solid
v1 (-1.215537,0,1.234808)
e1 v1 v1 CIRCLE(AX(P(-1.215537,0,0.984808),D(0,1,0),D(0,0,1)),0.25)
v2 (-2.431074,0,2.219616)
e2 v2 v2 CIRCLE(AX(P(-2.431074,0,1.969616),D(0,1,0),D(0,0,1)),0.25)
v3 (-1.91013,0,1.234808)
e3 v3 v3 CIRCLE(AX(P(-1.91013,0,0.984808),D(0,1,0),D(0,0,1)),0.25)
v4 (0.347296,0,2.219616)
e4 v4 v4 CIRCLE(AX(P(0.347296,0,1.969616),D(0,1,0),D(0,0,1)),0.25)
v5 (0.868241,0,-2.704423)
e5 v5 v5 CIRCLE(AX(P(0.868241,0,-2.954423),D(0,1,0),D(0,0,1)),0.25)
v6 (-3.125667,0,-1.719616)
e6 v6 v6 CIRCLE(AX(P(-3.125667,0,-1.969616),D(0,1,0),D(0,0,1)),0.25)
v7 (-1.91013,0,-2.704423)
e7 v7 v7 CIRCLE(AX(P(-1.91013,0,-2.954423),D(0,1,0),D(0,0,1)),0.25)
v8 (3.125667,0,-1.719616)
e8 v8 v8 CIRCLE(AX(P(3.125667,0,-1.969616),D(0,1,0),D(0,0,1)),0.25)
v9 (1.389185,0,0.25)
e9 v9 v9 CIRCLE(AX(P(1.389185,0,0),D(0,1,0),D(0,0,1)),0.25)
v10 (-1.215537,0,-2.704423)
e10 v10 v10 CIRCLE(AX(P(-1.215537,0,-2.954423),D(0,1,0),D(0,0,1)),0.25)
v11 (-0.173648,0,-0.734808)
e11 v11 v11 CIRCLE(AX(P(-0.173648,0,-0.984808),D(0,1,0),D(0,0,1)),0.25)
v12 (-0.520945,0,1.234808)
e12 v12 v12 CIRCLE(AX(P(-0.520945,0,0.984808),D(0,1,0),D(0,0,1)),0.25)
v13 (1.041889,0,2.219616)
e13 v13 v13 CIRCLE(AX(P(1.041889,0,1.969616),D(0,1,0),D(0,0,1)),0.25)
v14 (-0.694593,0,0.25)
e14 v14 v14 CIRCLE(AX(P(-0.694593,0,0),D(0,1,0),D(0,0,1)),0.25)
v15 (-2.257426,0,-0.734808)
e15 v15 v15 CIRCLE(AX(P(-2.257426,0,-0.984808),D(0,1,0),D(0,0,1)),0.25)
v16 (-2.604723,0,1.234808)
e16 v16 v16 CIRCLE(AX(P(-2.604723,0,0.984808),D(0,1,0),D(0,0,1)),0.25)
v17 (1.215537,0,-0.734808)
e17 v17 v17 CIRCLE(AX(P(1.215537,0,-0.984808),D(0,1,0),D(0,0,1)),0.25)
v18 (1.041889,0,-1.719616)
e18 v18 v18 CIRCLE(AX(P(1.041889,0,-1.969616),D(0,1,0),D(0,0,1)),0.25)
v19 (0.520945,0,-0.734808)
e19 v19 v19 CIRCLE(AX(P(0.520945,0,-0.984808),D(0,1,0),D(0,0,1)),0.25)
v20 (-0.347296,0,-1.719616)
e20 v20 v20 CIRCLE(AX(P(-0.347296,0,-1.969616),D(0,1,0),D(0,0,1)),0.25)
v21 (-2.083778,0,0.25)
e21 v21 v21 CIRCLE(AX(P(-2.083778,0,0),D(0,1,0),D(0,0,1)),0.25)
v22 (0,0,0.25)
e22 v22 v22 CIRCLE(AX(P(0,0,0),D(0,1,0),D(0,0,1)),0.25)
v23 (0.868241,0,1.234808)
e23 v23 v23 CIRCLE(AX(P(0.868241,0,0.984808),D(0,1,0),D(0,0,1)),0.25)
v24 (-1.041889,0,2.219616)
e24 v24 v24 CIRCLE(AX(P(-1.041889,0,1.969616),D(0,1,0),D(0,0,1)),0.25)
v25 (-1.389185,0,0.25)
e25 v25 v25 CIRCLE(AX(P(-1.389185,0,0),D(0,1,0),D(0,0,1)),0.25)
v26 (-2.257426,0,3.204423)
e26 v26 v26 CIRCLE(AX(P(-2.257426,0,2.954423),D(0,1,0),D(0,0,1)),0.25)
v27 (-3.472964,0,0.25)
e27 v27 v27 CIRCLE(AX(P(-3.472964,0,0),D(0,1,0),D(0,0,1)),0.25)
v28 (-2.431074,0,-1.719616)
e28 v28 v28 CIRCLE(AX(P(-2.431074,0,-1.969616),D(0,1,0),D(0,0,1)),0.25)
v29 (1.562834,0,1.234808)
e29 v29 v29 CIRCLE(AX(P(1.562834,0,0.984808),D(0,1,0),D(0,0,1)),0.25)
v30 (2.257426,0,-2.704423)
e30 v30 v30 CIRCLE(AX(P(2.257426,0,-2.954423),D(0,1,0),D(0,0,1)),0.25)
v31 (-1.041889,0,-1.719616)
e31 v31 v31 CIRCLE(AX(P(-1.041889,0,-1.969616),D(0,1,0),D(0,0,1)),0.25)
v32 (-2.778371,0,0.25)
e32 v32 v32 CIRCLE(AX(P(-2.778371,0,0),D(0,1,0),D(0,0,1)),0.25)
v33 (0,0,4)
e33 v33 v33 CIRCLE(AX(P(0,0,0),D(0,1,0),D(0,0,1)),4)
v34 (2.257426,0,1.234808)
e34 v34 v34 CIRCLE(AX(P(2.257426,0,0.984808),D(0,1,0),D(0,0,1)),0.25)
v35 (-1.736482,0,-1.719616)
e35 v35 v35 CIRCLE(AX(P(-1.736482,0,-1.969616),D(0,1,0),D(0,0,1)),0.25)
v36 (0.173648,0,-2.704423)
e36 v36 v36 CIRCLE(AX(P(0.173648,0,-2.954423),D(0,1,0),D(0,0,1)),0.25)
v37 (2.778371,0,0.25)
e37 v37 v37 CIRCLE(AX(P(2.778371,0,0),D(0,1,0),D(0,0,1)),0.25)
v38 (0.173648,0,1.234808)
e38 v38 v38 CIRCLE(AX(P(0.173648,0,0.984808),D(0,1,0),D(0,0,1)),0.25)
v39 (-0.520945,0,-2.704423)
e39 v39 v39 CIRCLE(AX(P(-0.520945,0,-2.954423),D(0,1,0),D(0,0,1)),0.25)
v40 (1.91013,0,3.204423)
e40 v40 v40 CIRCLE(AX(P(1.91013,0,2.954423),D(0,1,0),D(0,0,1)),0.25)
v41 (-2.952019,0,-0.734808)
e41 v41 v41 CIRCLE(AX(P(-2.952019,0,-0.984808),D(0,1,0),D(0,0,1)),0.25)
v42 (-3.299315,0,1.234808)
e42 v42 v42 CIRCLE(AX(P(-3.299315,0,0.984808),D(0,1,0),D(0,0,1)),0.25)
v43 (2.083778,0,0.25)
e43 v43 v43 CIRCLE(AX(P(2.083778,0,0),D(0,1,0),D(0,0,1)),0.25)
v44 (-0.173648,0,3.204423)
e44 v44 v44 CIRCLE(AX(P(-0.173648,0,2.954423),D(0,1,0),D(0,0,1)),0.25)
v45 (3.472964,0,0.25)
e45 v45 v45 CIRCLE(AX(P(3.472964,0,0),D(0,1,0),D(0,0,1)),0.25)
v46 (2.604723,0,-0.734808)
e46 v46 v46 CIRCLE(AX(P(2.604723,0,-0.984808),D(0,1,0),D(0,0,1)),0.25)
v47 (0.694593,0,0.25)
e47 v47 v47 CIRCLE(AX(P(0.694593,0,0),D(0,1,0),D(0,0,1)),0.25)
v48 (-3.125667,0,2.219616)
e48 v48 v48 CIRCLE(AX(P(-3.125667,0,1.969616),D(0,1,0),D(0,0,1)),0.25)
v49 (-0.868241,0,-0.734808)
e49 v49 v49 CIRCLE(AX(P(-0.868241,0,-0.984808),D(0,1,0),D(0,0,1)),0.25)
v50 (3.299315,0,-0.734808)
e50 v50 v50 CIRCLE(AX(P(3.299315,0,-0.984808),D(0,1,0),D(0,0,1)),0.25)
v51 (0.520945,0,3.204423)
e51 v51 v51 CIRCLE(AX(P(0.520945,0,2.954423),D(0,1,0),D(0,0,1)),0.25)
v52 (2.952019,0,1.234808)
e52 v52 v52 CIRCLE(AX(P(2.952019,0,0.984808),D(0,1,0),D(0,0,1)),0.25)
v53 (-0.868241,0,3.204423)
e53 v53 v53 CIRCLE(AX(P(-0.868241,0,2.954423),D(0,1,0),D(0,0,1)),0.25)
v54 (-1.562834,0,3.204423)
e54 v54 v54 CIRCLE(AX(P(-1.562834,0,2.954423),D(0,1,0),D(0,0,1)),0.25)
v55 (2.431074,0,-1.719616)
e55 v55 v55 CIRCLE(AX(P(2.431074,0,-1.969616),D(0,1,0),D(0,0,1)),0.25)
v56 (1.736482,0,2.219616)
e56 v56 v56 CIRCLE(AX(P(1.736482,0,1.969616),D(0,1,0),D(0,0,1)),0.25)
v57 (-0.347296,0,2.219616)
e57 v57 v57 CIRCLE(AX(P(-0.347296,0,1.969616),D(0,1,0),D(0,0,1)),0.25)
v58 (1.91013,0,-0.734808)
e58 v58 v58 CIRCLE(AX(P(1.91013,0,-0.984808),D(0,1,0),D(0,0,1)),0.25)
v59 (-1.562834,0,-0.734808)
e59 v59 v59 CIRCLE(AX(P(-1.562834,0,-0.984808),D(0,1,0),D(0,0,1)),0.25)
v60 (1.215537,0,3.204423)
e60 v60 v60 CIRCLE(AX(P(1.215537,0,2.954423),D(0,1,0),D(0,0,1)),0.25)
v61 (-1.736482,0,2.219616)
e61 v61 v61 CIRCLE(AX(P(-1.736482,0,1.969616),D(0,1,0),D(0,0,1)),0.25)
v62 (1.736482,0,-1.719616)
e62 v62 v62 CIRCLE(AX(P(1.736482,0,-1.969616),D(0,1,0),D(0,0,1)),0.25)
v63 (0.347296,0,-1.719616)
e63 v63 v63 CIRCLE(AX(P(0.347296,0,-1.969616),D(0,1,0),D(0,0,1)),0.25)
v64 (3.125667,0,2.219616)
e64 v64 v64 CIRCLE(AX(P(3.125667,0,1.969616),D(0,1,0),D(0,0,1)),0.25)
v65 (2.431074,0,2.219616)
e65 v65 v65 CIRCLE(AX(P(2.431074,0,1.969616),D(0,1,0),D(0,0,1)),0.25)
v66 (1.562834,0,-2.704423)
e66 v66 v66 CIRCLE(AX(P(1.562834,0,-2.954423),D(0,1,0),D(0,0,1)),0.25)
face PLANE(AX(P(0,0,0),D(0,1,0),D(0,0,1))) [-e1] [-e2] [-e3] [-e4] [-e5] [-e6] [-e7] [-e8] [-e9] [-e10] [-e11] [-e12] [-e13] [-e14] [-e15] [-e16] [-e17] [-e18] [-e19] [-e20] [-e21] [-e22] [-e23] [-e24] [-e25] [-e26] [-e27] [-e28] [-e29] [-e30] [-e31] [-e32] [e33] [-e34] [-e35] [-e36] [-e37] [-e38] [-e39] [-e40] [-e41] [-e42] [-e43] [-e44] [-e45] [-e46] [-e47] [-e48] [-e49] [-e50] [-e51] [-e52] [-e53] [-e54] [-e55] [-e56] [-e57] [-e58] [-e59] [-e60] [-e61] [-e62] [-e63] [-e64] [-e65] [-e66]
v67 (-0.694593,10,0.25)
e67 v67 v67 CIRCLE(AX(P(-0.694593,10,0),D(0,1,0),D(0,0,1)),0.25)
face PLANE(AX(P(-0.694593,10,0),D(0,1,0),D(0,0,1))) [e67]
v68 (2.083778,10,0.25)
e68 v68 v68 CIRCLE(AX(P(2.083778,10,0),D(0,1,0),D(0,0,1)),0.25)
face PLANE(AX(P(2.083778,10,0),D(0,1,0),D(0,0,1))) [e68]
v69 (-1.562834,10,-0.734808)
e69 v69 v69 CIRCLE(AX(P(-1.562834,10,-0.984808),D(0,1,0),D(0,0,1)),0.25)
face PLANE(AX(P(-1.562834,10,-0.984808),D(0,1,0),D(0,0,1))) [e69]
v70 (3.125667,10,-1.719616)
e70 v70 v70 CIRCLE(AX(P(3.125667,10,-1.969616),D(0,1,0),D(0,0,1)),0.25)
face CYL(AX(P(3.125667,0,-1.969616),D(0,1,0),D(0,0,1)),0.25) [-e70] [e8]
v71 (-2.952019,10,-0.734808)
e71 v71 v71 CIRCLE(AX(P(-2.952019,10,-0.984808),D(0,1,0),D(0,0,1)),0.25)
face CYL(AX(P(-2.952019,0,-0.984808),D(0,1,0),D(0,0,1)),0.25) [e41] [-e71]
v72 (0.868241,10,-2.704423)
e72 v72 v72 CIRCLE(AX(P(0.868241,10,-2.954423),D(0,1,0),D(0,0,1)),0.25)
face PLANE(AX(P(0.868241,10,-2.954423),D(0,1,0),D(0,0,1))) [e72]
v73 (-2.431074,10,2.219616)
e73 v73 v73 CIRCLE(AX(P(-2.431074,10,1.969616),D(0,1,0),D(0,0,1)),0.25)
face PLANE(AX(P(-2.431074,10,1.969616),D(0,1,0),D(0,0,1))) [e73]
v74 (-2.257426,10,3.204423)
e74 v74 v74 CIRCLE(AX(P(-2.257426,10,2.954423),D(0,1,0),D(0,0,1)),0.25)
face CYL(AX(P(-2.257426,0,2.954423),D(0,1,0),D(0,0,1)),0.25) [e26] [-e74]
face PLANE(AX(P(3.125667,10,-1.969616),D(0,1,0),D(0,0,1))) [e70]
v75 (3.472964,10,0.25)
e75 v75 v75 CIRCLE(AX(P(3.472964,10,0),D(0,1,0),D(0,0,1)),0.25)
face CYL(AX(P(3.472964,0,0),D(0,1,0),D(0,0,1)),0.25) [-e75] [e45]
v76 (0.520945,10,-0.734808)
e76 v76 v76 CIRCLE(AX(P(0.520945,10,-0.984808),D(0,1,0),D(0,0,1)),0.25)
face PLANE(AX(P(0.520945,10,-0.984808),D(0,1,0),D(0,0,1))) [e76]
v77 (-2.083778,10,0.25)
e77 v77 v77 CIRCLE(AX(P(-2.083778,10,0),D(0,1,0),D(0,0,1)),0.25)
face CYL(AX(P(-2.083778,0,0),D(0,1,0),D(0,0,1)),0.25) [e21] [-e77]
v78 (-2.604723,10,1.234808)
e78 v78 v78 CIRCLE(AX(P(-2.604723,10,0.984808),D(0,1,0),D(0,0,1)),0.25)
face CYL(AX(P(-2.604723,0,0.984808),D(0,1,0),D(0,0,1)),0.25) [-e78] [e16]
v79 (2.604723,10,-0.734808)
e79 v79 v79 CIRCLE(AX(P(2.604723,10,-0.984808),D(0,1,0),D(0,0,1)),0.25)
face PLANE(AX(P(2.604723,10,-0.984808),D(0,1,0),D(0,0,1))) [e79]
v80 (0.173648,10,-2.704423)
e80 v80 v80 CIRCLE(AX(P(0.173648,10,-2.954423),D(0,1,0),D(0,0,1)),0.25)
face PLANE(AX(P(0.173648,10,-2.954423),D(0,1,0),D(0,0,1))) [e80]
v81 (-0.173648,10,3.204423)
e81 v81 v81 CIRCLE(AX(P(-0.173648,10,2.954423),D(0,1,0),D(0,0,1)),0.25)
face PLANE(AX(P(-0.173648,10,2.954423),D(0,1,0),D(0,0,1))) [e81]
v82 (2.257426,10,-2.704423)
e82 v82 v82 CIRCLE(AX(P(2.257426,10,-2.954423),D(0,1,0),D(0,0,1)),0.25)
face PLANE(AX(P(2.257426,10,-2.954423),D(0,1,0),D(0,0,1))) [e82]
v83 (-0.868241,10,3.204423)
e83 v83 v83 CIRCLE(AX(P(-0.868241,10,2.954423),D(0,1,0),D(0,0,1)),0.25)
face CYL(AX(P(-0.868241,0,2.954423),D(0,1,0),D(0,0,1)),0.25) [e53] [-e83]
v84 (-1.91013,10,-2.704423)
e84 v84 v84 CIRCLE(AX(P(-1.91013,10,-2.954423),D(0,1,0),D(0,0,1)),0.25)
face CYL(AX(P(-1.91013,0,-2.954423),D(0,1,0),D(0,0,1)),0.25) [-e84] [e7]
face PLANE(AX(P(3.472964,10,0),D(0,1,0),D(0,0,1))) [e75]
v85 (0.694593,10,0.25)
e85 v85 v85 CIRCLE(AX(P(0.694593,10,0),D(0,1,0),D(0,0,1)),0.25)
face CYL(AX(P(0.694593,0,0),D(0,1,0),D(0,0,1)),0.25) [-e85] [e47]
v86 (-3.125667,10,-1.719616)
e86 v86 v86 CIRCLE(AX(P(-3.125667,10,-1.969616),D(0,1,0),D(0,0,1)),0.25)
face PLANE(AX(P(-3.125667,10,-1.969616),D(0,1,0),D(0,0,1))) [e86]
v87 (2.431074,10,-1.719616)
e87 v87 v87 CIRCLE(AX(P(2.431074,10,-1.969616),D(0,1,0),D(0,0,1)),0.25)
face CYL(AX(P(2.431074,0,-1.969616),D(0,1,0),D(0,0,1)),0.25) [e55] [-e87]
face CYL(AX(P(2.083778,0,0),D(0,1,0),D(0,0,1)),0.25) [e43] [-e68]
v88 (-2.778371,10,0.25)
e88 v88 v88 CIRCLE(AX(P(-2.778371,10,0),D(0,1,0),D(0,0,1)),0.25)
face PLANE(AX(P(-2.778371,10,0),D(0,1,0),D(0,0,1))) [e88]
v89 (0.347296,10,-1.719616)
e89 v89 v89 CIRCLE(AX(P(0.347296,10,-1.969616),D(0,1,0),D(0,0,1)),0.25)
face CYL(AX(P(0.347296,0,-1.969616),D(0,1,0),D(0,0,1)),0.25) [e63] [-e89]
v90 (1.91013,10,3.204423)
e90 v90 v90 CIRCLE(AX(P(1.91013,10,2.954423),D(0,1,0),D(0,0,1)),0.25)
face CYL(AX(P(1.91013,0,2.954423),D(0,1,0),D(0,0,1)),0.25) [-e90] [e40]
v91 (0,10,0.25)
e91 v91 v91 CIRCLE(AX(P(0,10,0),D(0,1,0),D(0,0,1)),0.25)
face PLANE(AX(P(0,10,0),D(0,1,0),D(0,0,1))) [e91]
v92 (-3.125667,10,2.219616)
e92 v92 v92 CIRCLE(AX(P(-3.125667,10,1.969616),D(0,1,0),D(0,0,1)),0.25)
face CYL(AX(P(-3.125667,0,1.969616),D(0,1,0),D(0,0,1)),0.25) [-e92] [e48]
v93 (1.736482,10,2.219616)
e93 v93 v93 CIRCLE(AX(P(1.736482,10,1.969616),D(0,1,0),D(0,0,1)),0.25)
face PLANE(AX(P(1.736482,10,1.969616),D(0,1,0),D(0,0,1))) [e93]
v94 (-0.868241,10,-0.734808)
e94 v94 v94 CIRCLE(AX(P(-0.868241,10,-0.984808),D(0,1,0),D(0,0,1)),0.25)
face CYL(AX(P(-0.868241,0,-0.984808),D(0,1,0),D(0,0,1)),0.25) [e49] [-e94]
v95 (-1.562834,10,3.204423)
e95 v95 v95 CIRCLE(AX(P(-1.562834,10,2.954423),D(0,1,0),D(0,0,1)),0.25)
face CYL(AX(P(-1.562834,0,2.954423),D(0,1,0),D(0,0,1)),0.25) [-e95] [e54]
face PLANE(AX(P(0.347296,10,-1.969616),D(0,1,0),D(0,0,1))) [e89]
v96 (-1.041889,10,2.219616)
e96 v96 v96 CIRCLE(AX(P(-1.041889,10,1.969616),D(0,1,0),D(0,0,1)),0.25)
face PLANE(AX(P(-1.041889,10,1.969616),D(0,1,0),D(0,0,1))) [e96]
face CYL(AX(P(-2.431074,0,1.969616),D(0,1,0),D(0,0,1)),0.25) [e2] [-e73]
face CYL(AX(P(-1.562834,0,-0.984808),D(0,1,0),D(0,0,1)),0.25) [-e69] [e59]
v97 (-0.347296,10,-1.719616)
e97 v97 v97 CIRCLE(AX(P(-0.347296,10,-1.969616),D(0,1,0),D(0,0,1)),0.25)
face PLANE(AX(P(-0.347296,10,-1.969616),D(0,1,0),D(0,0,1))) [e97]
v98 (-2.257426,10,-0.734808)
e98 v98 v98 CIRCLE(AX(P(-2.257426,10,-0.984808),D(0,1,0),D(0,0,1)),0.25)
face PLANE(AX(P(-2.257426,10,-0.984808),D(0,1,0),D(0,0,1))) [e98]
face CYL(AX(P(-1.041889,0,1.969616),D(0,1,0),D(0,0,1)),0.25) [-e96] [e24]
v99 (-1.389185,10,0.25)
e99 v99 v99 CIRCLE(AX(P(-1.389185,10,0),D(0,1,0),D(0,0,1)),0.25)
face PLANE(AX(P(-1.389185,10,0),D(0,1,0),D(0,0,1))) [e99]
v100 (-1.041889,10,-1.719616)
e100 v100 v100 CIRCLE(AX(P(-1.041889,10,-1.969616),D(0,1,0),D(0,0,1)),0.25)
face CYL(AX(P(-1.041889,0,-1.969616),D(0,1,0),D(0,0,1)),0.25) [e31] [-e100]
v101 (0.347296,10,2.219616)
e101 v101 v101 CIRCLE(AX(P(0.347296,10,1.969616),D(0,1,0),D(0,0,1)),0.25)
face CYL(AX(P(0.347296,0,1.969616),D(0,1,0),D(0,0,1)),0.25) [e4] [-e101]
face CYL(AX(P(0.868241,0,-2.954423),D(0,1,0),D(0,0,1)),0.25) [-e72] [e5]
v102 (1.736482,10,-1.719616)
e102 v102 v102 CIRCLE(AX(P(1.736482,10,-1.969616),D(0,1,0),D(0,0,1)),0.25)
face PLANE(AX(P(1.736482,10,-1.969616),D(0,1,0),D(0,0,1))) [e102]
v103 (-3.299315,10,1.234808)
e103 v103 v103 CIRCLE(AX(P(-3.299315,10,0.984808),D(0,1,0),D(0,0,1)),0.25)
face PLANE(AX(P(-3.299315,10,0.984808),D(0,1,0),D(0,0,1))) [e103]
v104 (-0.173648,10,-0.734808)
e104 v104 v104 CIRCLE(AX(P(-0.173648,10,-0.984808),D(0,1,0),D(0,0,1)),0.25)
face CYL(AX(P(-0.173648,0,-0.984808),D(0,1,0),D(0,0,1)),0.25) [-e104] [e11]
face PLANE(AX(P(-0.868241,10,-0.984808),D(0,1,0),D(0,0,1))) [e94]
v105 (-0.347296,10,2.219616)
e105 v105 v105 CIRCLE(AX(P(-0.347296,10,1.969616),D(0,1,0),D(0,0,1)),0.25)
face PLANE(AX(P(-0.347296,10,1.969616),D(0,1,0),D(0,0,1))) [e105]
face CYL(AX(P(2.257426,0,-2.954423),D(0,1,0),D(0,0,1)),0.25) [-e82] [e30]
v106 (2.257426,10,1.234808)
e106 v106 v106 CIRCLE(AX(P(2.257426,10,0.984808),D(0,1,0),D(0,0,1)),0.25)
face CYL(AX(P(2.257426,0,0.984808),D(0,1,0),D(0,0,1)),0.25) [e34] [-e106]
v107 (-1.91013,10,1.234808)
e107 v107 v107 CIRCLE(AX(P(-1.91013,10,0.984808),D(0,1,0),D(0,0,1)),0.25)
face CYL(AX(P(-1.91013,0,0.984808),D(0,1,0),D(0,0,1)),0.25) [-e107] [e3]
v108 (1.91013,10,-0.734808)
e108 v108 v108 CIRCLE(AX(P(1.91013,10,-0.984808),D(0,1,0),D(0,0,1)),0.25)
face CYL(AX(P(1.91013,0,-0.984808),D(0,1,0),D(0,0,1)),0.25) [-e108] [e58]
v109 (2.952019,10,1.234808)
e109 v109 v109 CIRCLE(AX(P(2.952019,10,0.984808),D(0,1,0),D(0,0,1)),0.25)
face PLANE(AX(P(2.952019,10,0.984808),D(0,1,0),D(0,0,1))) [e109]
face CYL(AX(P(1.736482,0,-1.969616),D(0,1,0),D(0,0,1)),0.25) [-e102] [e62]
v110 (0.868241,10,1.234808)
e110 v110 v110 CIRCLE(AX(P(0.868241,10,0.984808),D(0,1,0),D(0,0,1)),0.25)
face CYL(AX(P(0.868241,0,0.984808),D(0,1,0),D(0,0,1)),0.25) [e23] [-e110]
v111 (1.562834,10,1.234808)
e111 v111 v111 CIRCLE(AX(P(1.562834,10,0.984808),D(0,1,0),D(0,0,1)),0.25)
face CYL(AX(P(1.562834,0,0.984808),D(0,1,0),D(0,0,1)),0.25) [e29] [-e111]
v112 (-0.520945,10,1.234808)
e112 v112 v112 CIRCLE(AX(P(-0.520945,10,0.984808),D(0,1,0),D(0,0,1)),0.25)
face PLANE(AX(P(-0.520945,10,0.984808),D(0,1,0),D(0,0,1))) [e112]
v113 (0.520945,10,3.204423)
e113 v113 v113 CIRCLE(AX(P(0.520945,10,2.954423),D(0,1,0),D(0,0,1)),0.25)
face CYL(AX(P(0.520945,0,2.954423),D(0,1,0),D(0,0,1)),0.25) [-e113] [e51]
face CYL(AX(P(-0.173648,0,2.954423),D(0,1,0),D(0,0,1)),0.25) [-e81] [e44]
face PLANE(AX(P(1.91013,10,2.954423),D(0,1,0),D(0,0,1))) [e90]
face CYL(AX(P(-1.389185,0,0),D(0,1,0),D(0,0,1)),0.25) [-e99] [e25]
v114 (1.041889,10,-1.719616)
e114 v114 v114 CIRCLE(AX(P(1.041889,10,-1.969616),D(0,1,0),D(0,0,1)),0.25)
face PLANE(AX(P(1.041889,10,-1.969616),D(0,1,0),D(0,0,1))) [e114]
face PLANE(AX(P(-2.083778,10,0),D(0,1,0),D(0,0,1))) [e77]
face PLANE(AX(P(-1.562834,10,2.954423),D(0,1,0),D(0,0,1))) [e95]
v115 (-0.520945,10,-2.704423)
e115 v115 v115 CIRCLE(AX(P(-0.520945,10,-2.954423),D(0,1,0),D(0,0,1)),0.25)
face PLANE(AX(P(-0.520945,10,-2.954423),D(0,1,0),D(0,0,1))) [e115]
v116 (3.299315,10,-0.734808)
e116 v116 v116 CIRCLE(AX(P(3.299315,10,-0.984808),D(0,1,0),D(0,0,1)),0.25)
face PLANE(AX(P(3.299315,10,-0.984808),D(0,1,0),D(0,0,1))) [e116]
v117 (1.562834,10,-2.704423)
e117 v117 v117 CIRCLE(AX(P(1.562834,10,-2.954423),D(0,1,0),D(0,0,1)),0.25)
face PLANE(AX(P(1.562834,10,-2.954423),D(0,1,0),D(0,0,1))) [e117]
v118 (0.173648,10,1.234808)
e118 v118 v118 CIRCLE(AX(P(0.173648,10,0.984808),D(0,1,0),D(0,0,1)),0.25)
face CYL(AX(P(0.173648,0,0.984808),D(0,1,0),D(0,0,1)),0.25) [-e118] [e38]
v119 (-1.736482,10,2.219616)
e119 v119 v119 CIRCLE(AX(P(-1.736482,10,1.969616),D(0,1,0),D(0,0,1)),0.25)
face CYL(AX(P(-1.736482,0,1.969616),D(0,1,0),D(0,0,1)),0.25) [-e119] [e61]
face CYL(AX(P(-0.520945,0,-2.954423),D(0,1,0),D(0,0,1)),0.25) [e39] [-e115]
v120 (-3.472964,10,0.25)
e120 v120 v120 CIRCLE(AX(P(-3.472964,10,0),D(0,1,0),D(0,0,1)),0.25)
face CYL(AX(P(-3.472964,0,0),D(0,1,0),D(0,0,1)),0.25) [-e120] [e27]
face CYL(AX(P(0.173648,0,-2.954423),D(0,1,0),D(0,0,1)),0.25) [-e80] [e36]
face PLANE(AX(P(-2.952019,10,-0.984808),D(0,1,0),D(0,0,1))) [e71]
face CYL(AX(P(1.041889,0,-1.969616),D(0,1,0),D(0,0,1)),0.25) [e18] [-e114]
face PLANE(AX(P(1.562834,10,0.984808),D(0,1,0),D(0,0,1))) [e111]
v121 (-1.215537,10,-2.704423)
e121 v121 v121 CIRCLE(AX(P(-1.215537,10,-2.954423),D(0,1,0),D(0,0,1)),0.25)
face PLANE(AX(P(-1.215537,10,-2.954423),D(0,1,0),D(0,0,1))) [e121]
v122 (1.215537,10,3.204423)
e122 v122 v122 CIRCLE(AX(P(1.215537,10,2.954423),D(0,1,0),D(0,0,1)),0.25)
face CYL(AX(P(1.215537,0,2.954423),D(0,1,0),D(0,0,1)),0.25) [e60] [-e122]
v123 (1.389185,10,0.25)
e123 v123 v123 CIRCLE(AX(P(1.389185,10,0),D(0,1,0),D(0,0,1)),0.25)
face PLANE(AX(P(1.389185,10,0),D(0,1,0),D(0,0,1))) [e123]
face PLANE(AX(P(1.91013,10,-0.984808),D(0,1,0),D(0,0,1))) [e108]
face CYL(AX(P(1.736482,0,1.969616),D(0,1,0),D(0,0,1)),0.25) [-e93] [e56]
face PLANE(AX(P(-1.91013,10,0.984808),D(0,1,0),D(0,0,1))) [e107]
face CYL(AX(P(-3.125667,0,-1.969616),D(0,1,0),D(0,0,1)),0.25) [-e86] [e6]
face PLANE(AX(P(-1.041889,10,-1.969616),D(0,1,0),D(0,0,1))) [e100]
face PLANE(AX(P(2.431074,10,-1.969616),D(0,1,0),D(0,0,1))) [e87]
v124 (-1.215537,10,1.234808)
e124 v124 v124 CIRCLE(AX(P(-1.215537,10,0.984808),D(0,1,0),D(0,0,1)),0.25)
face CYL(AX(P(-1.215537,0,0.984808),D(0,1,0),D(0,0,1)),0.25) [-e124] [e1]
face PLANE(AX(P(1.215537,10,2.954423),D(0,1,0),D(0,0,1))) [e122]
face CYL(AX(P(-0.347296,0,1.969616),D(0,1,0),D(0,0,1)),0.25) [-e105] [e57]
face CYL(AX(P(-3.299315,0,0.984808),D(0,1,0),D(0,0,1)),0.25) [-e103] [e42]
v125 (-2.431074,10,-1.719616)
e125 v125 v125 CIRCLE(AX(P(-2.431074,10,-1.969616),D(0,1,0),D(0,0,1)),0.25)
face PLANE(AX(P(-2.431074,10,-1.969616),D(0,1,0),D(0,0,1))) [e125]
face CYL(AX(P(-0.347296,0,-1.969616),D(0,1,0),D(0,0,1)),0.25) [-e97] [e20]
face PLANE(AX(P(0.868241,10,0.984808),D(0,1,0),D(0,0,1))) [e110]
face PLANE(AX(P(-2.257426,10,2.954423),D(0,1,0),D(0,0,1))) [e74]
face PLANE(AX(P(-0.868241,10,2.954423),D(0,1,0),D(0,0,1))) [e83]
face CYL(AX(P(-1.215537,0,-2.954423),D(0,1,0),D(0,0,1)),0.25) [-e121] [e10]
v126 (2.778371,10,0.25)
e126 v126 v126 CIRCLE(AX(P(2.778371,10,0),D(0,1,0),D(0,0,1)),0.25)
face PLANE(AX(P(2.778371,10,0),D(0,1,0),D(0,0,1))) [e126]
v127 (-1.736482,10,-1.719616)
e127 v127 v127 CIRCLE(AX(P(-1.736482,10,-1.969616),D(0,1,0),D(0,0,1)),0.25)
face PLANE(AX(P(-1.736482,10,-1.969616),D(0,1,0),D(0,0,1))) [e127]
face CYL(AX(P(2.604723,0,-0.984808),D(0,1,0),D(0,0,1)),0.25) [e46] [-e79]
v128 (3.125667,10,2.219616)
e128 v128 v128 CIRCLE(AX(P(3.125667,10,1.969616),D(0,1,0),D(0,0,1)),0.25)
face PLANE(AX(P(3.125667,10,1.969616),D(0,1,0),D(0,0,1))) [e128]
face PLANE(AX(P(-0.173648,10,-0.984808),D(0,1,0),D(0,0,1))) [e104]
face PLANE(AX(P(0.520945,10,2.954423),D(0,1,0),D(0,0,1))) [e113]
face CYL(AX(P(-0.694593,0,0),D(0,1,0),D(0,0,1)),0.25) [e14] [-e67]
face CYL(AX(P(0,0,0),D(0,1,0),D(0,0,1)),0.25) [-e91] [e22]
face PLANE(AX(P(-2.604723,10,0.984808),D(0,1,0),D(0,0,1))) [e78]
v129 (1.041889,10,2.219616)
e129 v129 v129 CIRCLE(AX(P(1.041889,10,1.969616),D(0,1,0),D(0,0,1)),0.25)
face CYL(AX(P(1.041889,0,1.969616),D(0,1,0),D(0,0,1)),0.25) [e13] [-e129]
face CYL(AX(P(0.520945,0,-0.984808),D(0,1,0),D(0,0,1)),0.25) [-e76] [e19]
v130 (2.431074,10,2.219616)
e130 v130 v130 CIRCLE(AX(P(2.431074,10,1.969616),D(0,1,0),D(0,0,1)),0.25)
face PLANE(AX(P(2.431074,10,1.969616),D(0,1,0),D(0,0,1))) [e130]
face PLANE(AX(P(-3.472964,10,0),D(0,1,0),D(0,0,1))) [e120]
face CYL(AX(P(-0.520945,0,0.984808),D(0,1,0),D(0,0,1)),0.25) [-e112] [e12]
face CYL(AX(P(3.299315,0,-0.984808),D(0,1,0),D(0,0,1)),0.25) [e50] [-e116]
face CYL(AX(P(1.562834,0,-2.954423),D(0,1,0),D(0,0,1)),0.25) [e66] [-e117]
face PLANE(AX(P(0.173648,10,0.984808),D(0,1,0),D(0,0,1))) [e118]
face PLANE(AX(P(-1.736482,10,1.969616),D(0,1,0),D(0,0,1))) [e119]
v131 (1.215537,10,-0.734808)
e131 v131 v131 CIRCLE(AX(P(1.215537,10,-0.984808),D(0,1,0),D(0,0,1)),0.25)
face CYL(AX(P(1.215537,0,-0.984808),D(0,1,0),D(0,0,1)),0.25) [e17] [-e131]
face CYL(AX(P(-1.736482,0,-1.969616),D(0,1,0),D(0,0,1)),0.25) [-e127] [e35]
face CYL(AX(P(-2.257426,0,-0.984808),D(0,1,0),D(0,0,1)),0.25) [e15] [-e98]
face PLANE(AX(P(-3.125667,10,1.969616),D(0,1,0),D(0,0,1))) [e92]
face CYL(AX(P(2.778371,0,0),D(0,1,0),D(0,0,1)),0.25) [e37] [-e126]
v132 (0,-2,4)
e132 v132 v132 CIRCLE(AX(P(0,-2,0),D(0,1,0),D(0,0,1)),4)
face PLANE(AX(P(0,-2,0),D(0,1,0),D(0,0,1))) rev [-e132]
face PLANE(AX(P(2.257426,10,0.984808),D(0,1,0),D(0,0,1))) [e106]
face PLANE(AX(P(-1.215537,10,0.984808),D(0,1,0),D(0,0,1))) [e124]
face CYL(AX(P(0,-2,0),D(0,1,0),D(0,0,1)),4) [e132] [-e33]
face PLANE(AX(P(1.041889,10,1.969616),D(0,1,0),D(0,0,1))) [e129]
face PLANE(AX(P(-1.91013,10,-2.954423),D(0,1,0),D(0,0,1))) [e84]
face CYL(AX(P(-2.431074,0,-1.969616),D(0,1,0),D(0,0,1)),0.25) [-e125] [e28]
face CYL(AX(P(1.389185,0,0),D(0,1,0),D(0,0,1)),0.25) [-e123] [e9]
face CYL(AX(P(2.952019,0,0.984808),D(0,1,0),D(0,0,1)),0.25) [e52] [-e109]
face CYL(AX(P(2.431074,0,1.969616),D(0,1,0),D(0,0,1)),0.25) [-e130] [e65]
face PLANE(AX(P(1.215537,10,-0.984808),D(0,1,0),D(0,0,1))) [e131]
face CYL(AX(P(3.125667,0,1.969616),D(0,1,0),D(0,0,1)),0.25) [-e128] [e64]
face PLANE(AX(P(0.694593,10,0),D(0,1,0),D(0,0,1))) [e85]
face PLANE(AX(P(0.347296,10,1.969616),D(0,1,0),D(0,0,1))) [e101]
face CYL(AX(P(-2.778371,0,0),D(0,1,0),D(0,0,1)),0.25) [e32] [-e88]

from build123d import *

# Parameters (mm, degrees)
SKETCH3_R               = 0.25
SKETCH1_R               = 4
BOSS_EXTRUDE1_DEPTH     = 2
FILL_PATTERN2_OUTLINE_R = 0.25
FILL_PATTERN2_DEPTH     = 10


# Read off the part's stored shape, not the designer's step: Fill Pattern2
with BuildPart() as part:
    # Sweep1: sweep along a path in Sketch2
    with BuildLine(Plane(origin=(0, 0, 0), x_dir=(0, 0, -1), z_dir=(1, 0, 0))) as sweep1_path:
        Line((0, 0), (0, 10))
    # Sketch3 → Sweep1 (sweep)
    with BuildSketch(Plane(origin=(0, 0, 0), x_dir=(1, 0, 0), z_dir=(0, 1, 0))):
        Circle(SKETCH3_R)
    sweep(path=sweep1_path.line)

    # Sketch1 → Boss-Extrude1 (add)
    with BuildSketch(Plane(origin=(0, 0, 0), x_dir=(1, 0, 0), z_dir=(0, 1, 0))):
        with Locations(Location((0, 0, 0), (0, 0, 270))):
            Circle(SKETCH1_R)
    extrude(amount=-BOSS_EXTRUDE1_DEPTH)

    # Fill Pattern2 outline → Fill Pattern2 (add)
    with BuildSketch(Plane(origin=(0, 0, 0), x_dir=(1, 0, 0), z_dir=(0, 1, 0))):
        with Locations((-3.472963553, 0)):
            Circle(FILL_PATTERN2_OUTLINE_R)
        with Locations((-3.299315376, -0.984807753)):
            Circle(FILL_PATTERN2_OUTLINE_R)
        with Locations((-3.125667198, -1.969615506)):
            Circle(FILL_PATTERN2_OUTLINE_R)
        with Locations((-3.125667198, 1.969615506)):
            Circle(FILL_PATTERN2_OUTLINE_R)
        with Locations((-2.95201902, 0.984807753)):
            Circle(FILL_PATTERN2_OUTLINE_R)
        with Locations((-2.778370843, 0)):
            Circle(FILL_PATTERN2_OUTLINE_R)
        with Locations((-2.604722665, -0.984807753)):
            Circle(FILL_PATTERN2_OUTLINE_R)
        with Locations((-2.431074487, -1.969615506)):
            Circle(FILL_PATTERN2_OUTLINE_R)
        with Locations((-2.25742631, -2.954423259)):
            Circle(FILL_PATTERN2_OUTLINE_R)
        with Locations((-2.431074487, 1.969615506)):
            Circle(FILL_PATTERN2_OUTLINE_R)
        with Locations((-2.25742631, 0.984807753)):
            Circle(FILL_PATTERN2_OUTLINE_R)
        with Locations((-2.083778132, 0)):
            Circle(FILL_PATTERN2_OUTLINE_R)
        with Locations((-1.910129954, -0.984807753)):
            Circle(FILL_PATTERN2_OUTLINE_R)
        with Locations((-1.736481777, -1.969615506)):
            Circle(FILL_PATTERN2_OUTLINE_R)
        with Locations((-1.562833599, -2.954423259)):
            Circle(FILL_PATTERN2_OUTLINE_R)
        with Locations((-1.910129954, 2.954423259)):
            Circle(FILL_PATTERN2_OUTLINE_R)
        with Locations((-1.736481777, 1.969615506)):
            Circle(FILL_PATTERN2_OUTLINE_R)
        with Locations((-1.562833599, 0.984807753)):
            Circle(FILL_PATTERN2_OUTLINE_R)
        with Locations((-1.389185421, 0)):
            Circle(FILL_PATTERN2_OUTLINE_R)
        with Locations((-1.215537244, -0.984807753)):
            Circle(FILL_PATTERN2_OUTLINE_R)
        with Locations((-1.041889066, -1.969615506)):
            Circle(FILL_PATTERN2_OUTLINE_R)
        with Locations((-0.868240888, -2.954423259)):
            Circle(FILL_PATTERN2_OUTLINE_R)
        with Locations((-1.215537244, 2.954423259)):
            Circle(FILL_PATTERN2_OUTLINE_R)
        with Locations((-1.041889066, 1.969615506)):
            Circle(FILL_PATTERN2_OUTLINE_R)
        with Locations((-0.868240888, 0.984807753)):
            Circle(FILL_PATTERN2_OUTLINE_R)
        with Locations((-0.694592711, 0)):
            Circle(FILL_PATTERN2_OUTLINE_R)
        with Locations((-0.520944533, -0.984807753)):
            Circle(FILL_PATTERN2_OUTLINE_R)
        with Locations((-0.347296355, -1.969615506)):
            Circle(FILL_PATTERN2_OUTLINE_R)
        with Locations((-0.173648178, -2.954423259)):
            Circle(FILL_PATTERN2_OUTLINE_R)
        with Locations((-0.520944533, 2.954423259)):
            Circle(FILL_PATTERN2_OUTLINE_R)
        with Locations((-0.347296355, 1.969615506)):
            Circle(FILL_PATTERN2_OUTLINE_R)
        with Locations((-0.173648178, 0.984807753)):
            Circle(FILL_PATTERN2_OUTLINE_R)
        with Locations((0.173648178, -0.984807753)):
            Circle(FILL_PATTERN2_OUTLINE_R)
        with Locations((0.347296355, -1.969615506)):
            Circle(FILL_PATTERN2_OUTLINE_R)
        with Locations((0.520944533, -2.954423259)):
            Circle(FILL_PATTERN2_OUTLINE_R)
        with Locations((0.173648178, 2.954423259)):
            Circle(FILL_PATTERN2_OUTLINE_R)
        with Locations((0.347296355, 1.969615506)):
            Circle(FILL_PATTERN2_OUTLINE_R)
        with Locations((0.520944533, 0.984807753)):
            Circle(FILL_PATTERN2_OUTLINE_R)
        with Locations((0.694592711, 0)):
            Circle(FILL_PATTERN2_OUTLINE_R)
        with Locations((0.868240888, -0.984807753)):
            Circle(FILL_PATTERN2_OUTLINE_R)
        with Locations((1.041889066, -1.969615506)):
            Circle(FILL_PATTERN2_OUTLINE_R)
        with Locations((1.215537244, -2.954423259)):
            Circle(FILL_PATTERN2_OUTLINE_R)
        with Locations((0.868240888, 2.954423259)):
            Circle(FILL_PATTERN2_OUTLINE_R)
        with Locations((1.041889066, 1.969615506)):
            Circle(FILL_PATTERN2_OUTLINE_R)
        with Locations((1.215537244, 0.984807753)):
            Circle(FILL_PATTERN2_OUTLINE_R)
        with Locations((1.389185421, 0)):
            Circle(FILL_PATTERN2_OUTLINE_R)
        with Locations((1.562833599, -0.984807753)):
            Circle(FILL_PATTERN2_OUTLINE_R)
        with Locations((1.736481777, -1.969615506)):
            Circle(FILL_PATTERN2_OUTLINE_R)
        with Locations((1.910129954, -2.954423259)):
            Circle(FILL_PATTERN2_OUTLINE_R)
        with Locations((1.562833599, 2.954423259)):
            Circle(FILL_PATTERN2_OUTLINE_R)
        with Locations((1.736481777, 1.969615506)):
            Circle(FILL_PATTERN2_OUTLINE_R)
        with Locations((1.910129954, 0.984807753)):
            Circle(FILL_PATTERN2_OUTLINE_R)
        with Locations((2.083778132, 0)):
            Circle(FILL_PATTERN2_OUTLINE_R)
        with Locations((2.25742631, -0.984807753)):
            Circle(FILL_PATTERN2_OUTLINE_R)
        with Locations((2.431074487, -1.969615506)):
            Circle(FILL_PATTERN2_OUTLINE_R)
        with Locations((2.25742631, 2.954423259)):
            Circle(FILL_PATTERN2_OUTLINE_R)
        with Locations((2.431074487, 1.969615506)):
            Circle(FILL_PATTERN2_OUTLINE_R)
        with Locations((2.604722665, 0.984807753)):
            Circle(FILL_PATTERN2_OUTLINE_R)
        with Locations((2.778370843, 0)):
            Circle(FILL_PATTERN2_OUTLINE_R)
        with Locations((2.95201902, -0.984807753)):
            Circle(FILL_PATTERN2_OUTLINE_R)
        with Locations((3.125667198, -1.969615506)):
            Circle(FILL_PATTERN2_OUTLINE_R)
        with Locations((3.125667198, 1.969615506)):
            Circle(FILL_PATTERN2_OUTLINE_R)
        with Locations((3.299315376, 0.984807753)):
            Circle(FILL_PATTERN2_OUTLINE_R)
        with Locations((3.472963553, 0)):
            Circle(FILL_PATTERN2_OUTLINE_R)
    extrude(amount=FILL_PATTERN2_DEPTH)


solid = part.part
